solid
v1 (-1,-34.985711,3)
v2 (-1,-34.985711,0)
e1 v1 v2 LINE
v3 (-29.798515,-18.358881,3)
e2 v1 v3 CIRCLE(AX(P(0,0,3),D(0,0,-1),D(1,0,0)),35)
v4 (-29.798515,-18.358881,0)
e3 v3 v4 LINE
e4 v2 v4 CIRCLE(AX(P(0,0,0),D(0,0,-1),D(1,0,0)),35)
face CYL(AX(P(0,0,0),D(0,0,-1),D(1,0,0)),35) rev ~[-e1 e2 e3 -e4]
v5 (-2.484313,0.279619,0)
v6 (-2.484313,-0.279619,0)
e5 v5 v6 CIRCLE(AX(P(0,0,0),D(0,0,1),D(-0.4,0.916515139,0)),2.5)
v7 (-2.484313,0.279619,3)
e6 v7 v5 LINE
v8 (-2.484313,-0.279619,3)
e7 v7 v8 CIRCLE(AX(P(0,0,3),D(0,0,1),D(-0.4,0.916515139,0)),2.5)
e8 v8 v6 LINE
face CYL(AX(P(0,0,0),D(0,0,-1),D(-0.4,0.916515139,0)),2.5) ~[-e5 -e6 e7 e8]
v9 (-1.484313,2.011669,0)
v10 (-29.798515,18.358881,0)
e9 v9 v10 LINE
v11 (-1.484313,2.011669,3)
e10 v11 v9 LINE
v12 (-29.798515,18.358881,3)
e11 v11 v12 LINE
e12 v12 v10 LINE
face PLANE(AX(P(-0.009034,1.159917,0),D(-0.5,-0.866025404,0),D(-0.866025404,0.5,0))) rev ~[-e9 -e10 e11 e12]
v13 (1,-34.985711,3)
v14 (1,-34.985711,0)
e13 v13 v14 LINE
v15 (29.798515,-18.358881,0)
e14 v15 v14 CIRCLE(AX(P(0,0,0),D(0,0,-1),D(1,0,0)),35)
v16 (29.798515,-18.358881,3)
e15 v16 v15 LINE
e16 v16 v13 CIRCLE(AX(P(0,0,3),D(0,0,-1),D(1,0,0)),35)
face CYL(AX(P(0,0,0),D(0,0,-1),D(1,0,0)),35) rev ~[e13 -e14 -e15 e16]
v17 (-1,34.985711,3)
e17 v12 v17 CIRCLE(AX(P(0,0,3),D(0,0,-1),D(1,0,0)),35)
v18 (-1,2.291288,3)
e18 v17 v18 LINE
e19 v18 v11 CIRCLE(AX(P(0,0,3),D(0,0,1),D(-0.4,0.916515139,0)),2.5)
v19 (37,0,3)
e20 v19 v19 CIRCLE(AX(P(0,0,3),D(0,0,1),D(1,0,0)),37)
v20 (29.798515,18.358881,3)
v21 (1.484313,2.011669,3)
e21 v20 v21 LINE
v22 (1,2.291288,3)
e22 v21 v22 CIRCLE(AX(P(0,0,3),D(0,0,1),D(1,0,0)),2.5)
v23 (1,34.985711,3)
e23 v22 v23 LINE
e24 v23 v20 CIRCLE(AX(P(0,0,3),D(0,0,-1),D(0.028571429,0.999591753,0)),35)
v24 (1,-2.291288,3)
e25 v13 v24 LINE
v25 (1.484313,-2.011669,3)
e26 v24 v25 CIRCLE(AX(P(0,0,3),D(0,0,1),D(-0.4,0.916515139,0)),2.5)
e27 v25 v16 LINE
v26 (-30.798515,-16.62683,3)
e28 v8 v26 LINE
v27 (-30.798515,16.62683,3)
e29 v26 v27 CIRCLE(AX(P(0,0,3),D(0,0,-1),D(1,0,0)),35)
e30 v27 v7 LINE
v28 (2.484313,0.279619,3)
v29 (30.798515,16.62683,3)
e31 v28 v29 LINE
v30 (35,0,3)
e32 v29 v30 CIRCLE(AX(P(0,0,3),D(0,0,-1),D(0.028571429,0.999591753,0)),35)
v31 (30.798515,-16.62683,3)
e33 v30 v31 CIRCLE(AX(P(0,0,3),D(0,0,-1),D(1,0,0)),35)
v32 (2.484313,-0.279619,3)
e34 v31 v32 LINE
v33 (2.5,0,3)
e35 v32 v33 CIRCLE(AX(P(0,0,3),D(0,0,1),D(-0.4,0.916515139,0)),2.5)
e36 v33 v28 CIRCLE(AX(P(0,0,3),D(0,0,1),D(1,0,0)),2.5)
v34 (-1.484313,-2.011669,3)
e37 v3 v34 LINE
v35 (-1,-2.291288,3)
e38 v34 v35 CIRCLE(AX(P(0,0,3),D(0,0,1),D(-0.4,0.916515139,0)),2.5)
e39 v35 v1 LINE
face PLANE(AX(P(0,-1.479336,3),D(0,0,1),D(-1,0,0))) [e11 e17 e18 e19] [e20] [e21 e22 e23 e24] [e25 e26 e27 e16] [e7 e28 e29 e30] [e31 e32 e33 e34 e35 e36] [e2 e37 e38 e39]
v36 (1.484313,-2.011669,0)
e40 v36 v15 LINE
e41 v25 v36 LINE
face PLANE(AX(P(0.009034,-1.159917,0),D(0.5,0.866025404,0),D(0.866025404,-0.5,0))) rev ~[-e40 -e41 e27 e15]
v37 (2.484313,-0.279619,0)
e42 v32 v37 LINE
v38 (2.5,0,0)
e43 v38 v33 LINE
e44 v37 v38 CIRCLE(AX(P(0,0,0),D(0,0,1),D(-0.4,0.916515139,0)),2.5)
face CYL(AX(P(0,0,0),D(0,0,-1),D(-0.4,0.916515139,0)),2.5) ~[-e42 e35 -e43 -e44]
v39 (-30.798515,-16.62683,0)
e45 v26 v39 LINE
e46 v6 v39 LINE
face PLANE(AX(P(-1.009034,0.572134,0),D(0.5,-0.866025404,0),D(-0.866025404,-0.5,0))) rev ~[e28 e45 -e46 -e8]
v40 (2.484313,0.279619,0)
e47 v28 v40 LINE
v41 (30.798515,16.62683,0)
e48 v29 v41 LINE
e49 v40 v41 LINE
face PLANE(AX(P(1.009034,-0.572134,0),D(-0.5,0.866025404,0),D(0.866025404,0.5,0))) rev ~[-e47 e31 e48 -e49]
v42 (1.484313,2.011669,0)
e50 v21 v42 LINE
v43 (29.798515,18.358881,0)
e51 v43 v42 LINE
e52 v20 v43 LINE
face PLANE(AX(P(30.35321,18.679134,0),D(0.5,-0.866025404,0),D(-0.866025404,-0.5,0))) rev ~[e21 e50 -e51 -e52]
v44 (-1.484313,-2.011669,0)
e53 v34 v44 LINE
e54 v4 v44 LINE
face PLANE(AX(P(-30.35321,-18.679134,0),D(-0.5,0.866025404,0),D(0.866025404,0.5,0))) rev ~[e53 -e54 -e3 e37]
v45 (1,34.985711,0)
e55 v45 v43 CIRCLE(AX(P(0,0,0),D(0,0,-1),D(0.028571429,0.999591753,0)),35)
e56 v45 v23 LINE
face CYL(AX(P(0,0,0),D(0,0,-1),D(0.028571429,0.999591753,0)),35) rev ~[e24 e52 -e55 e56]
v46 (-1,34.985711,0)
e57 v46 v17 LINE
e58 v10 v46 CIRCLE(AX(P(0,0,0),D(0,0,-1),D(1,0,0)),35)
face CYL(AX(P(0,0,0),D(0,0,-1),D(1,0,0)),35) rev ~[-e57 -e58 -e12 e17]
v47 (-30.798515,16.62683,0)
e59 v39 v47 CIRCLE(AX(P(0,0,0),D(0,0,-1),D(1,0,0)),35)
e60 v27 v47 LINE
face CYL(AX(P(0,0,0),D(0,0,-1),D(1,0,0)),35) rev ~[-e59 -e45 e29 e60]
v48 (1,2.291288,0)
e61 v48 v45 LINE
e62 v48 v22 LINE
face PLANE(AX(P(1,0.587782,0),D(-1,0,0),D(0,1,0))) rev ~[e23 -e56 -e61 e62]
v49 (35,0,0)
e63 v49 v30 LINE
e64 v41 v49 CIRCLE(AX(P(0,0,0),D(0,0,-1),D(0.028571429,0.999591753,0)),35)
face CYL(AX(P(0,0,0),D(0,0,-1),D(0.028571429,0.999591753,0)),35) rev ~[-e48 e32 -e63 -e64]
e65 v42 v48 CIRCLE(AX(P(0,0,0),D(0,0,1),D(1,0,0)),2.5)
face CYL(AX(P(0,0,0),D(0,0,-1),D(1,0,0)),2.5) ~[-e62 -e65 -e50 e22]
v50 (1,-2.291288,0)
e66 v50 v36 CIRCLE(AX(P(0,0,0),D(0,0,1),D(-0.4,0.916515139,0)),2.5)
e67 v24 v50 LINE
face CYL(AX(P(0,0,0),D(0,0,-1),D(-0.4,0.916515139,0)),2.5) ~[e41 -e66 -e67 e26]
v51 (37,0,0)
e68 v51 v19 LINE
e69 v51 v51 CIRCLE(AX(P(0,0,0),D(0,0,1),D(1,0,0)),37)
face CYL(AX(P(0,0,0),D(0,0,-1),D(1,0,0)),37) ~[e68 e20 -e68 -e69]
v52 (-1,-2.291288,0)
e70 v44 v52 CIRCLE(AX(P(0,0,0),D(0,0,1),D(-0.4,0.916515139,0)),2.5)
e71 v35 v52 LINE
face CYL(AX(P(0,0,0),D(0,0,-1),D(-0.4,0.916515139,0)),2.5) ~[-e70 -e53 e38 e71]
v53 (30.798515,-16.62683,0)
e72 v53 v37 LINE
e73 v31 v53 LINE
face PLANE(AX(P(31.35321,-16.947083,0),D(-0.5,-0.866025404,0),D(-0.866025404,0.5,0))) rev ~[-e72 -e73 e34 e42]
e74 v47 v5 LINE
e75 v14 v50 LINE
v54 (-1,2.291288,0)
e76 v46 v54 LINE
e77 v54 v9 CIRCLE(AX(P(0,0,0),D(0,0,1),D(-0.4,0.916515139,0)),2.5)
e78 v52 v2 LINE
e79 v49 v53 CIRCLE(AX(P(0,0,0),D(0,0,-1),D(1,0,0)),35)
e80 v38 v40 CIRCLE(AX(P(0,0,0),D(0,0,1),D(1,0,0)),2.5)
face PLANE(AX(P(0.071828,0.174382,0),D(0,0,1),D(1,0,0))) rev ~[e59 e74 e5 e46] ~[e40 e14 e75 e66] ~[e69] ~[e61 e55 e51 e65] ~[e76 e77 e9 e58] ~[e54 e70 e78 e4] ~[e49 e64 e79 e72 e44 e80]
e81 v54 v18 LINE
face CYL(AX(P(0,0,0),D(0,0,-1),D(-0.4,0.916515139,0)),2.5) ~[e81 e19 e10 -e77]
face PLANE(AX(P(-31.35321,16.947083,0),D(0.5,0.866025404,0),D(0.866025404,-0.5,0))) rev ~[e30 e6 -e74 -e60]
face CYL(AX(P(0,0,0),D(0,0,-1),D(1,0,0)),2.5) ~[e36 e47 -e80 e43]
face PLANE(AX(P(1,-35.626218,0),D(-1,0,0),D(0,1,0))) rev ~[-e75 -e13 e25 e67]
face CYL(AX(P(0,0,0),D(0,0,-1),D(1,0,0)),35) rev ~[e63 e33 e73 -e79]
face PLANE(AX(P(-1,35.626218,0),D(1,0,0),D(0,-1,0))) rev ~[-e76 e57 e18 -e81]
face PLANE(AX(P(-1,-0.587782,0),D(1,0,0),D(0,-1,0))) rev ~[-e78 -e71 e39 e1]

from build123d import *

# Parameters (mm, degrees)
F0_R            = 37
F1_DEPTH        = 3
F2_DEPTH        = 3
F2_COPIES_COUNT = 6


# Not quite as in the source:
# - a pattern or mirror of a feature is missing from the dataset's text; its kind, count and spacing are read off the source's solid


with BuildPart() as f1:
    # F0 (on Top) → F1 (new body)
    with BuildSketch(Plane.XY):
        Circle(F0_R)
        with BuildLine():
            Line((1, 35.6262177595), (1, 34.9857113691))
            ThreePointArc((1, 34.9857113691), (25.099800796, 24.3926218353), (35, 0))
            ThreePointArc((35, 0), (-24.3926218353, -25.099800796), (-1, 34.9857113691))
            Line((-1, 34.9857113691), (-1, 35.6262177595))
            Line((-1, 35.6262177595), (1, 35.6262177595))
        make_face(mode=Mode.SUBTRACT)
        with BuildLine():
            ThreePointArc((-1, 34.9857113691), (0, 35), (1, 34.9857113691))
            Line((1, 34.9857113691), (1, 35.6262177595))
            Line((1, 35.6262177595), (-1, 35.6262177595))
            Line((-1, 35.6262177595), (-1, 34.9857113691))
        make_face()
    extrude(amount=F1_DEPTH)



with BuildPart() as f1b:
    # F0 (on Top) → F1, piece 2 (new body)
    with BuildSketch(Plane.XY):
        with BuildLine():
            ThreePointArc((-1, 2.2912878475), (-1.3693063938, -2.0916500663), (2.5, 0))
            ThreePointArc((2.5, 0), (2.0916500663, 1.3693063938), (1, 2.2912878475))
            Line((1, 2.2912878475), (1, 0.5877822405))
            Line((1, 0.5877822405), (-1, 0.5877822405))
            Line((-1, 0.5877822405), (-1, 2.2912878475))
        make_face()
        with BuildLine():
            Line((1, 0.5877822405), (1, 2.2912878475))
            ThreePointArc((1, 2.2912878475), (0, 2.5), (-1, 2.2912878475))
            Line((-1, 2.2912878475), (-1, 0.5877822405))
            Line((-1, 0.5877822405), (1, 0.5877822405))
        make_face()
    extrude(amount=F1_DEPTH)


with BuildPart() as f1_1:
    add(f1.part)

    add(f1b.part)  # F2 merges F1b
    # F0 (on Top) → F2 (join)
    with BuildSketch(Plane.XY):
        with BuildLine():
            Line((1, 0.5877822405), (1, 2.2912878475))
            ThreePointArc((1, 2.2912878475), (0, 2.5), (-1, 2.2912878475))
            Line((-1, 2.2912878475), (-1, 0.5877822405))
            Line((-1, 0.5877822405), (1, 0.5877822405))
        make_face()
        with BuildLine():
            ThreePointArc((-1, 2.2912878475), (0, 2.5), (1, 2.2912878475))
            Line((1, 2.2912878475), (1, 34.9857113691))
            ThreePointArc((1, 34.9857113691), (0, 35), (-1, 34.9857113691))
            Line((-1, 34.9857113691), (-1, 2.2912878475))
        make_face()
        with BuildLine():
            ThreePointArc((-1, 34.9857113691), (0, 35), (1, 34.9857113691))
            Line((1, 34.9857113691), (1, 35.6262177595))
            Line((1, 35.6262177595), (-1, 35.6262177595))
            Line((-1, 35.6262177595), (-1, 34.9857113691))
        make_face()
    f2 = extrude(amount=F2_DEPTH)

    # F2_copies: F2 ×6 about axis
    f2_copies_axis = Axis((0, 0, 0), (0, 0, 1))
    for i in range(1, F2_COPIES_COUNT):
        add(f2.rotate(f2_copies_axis, i * 360 / F2_COPIES_COUNT))


solid = f1_1.part
